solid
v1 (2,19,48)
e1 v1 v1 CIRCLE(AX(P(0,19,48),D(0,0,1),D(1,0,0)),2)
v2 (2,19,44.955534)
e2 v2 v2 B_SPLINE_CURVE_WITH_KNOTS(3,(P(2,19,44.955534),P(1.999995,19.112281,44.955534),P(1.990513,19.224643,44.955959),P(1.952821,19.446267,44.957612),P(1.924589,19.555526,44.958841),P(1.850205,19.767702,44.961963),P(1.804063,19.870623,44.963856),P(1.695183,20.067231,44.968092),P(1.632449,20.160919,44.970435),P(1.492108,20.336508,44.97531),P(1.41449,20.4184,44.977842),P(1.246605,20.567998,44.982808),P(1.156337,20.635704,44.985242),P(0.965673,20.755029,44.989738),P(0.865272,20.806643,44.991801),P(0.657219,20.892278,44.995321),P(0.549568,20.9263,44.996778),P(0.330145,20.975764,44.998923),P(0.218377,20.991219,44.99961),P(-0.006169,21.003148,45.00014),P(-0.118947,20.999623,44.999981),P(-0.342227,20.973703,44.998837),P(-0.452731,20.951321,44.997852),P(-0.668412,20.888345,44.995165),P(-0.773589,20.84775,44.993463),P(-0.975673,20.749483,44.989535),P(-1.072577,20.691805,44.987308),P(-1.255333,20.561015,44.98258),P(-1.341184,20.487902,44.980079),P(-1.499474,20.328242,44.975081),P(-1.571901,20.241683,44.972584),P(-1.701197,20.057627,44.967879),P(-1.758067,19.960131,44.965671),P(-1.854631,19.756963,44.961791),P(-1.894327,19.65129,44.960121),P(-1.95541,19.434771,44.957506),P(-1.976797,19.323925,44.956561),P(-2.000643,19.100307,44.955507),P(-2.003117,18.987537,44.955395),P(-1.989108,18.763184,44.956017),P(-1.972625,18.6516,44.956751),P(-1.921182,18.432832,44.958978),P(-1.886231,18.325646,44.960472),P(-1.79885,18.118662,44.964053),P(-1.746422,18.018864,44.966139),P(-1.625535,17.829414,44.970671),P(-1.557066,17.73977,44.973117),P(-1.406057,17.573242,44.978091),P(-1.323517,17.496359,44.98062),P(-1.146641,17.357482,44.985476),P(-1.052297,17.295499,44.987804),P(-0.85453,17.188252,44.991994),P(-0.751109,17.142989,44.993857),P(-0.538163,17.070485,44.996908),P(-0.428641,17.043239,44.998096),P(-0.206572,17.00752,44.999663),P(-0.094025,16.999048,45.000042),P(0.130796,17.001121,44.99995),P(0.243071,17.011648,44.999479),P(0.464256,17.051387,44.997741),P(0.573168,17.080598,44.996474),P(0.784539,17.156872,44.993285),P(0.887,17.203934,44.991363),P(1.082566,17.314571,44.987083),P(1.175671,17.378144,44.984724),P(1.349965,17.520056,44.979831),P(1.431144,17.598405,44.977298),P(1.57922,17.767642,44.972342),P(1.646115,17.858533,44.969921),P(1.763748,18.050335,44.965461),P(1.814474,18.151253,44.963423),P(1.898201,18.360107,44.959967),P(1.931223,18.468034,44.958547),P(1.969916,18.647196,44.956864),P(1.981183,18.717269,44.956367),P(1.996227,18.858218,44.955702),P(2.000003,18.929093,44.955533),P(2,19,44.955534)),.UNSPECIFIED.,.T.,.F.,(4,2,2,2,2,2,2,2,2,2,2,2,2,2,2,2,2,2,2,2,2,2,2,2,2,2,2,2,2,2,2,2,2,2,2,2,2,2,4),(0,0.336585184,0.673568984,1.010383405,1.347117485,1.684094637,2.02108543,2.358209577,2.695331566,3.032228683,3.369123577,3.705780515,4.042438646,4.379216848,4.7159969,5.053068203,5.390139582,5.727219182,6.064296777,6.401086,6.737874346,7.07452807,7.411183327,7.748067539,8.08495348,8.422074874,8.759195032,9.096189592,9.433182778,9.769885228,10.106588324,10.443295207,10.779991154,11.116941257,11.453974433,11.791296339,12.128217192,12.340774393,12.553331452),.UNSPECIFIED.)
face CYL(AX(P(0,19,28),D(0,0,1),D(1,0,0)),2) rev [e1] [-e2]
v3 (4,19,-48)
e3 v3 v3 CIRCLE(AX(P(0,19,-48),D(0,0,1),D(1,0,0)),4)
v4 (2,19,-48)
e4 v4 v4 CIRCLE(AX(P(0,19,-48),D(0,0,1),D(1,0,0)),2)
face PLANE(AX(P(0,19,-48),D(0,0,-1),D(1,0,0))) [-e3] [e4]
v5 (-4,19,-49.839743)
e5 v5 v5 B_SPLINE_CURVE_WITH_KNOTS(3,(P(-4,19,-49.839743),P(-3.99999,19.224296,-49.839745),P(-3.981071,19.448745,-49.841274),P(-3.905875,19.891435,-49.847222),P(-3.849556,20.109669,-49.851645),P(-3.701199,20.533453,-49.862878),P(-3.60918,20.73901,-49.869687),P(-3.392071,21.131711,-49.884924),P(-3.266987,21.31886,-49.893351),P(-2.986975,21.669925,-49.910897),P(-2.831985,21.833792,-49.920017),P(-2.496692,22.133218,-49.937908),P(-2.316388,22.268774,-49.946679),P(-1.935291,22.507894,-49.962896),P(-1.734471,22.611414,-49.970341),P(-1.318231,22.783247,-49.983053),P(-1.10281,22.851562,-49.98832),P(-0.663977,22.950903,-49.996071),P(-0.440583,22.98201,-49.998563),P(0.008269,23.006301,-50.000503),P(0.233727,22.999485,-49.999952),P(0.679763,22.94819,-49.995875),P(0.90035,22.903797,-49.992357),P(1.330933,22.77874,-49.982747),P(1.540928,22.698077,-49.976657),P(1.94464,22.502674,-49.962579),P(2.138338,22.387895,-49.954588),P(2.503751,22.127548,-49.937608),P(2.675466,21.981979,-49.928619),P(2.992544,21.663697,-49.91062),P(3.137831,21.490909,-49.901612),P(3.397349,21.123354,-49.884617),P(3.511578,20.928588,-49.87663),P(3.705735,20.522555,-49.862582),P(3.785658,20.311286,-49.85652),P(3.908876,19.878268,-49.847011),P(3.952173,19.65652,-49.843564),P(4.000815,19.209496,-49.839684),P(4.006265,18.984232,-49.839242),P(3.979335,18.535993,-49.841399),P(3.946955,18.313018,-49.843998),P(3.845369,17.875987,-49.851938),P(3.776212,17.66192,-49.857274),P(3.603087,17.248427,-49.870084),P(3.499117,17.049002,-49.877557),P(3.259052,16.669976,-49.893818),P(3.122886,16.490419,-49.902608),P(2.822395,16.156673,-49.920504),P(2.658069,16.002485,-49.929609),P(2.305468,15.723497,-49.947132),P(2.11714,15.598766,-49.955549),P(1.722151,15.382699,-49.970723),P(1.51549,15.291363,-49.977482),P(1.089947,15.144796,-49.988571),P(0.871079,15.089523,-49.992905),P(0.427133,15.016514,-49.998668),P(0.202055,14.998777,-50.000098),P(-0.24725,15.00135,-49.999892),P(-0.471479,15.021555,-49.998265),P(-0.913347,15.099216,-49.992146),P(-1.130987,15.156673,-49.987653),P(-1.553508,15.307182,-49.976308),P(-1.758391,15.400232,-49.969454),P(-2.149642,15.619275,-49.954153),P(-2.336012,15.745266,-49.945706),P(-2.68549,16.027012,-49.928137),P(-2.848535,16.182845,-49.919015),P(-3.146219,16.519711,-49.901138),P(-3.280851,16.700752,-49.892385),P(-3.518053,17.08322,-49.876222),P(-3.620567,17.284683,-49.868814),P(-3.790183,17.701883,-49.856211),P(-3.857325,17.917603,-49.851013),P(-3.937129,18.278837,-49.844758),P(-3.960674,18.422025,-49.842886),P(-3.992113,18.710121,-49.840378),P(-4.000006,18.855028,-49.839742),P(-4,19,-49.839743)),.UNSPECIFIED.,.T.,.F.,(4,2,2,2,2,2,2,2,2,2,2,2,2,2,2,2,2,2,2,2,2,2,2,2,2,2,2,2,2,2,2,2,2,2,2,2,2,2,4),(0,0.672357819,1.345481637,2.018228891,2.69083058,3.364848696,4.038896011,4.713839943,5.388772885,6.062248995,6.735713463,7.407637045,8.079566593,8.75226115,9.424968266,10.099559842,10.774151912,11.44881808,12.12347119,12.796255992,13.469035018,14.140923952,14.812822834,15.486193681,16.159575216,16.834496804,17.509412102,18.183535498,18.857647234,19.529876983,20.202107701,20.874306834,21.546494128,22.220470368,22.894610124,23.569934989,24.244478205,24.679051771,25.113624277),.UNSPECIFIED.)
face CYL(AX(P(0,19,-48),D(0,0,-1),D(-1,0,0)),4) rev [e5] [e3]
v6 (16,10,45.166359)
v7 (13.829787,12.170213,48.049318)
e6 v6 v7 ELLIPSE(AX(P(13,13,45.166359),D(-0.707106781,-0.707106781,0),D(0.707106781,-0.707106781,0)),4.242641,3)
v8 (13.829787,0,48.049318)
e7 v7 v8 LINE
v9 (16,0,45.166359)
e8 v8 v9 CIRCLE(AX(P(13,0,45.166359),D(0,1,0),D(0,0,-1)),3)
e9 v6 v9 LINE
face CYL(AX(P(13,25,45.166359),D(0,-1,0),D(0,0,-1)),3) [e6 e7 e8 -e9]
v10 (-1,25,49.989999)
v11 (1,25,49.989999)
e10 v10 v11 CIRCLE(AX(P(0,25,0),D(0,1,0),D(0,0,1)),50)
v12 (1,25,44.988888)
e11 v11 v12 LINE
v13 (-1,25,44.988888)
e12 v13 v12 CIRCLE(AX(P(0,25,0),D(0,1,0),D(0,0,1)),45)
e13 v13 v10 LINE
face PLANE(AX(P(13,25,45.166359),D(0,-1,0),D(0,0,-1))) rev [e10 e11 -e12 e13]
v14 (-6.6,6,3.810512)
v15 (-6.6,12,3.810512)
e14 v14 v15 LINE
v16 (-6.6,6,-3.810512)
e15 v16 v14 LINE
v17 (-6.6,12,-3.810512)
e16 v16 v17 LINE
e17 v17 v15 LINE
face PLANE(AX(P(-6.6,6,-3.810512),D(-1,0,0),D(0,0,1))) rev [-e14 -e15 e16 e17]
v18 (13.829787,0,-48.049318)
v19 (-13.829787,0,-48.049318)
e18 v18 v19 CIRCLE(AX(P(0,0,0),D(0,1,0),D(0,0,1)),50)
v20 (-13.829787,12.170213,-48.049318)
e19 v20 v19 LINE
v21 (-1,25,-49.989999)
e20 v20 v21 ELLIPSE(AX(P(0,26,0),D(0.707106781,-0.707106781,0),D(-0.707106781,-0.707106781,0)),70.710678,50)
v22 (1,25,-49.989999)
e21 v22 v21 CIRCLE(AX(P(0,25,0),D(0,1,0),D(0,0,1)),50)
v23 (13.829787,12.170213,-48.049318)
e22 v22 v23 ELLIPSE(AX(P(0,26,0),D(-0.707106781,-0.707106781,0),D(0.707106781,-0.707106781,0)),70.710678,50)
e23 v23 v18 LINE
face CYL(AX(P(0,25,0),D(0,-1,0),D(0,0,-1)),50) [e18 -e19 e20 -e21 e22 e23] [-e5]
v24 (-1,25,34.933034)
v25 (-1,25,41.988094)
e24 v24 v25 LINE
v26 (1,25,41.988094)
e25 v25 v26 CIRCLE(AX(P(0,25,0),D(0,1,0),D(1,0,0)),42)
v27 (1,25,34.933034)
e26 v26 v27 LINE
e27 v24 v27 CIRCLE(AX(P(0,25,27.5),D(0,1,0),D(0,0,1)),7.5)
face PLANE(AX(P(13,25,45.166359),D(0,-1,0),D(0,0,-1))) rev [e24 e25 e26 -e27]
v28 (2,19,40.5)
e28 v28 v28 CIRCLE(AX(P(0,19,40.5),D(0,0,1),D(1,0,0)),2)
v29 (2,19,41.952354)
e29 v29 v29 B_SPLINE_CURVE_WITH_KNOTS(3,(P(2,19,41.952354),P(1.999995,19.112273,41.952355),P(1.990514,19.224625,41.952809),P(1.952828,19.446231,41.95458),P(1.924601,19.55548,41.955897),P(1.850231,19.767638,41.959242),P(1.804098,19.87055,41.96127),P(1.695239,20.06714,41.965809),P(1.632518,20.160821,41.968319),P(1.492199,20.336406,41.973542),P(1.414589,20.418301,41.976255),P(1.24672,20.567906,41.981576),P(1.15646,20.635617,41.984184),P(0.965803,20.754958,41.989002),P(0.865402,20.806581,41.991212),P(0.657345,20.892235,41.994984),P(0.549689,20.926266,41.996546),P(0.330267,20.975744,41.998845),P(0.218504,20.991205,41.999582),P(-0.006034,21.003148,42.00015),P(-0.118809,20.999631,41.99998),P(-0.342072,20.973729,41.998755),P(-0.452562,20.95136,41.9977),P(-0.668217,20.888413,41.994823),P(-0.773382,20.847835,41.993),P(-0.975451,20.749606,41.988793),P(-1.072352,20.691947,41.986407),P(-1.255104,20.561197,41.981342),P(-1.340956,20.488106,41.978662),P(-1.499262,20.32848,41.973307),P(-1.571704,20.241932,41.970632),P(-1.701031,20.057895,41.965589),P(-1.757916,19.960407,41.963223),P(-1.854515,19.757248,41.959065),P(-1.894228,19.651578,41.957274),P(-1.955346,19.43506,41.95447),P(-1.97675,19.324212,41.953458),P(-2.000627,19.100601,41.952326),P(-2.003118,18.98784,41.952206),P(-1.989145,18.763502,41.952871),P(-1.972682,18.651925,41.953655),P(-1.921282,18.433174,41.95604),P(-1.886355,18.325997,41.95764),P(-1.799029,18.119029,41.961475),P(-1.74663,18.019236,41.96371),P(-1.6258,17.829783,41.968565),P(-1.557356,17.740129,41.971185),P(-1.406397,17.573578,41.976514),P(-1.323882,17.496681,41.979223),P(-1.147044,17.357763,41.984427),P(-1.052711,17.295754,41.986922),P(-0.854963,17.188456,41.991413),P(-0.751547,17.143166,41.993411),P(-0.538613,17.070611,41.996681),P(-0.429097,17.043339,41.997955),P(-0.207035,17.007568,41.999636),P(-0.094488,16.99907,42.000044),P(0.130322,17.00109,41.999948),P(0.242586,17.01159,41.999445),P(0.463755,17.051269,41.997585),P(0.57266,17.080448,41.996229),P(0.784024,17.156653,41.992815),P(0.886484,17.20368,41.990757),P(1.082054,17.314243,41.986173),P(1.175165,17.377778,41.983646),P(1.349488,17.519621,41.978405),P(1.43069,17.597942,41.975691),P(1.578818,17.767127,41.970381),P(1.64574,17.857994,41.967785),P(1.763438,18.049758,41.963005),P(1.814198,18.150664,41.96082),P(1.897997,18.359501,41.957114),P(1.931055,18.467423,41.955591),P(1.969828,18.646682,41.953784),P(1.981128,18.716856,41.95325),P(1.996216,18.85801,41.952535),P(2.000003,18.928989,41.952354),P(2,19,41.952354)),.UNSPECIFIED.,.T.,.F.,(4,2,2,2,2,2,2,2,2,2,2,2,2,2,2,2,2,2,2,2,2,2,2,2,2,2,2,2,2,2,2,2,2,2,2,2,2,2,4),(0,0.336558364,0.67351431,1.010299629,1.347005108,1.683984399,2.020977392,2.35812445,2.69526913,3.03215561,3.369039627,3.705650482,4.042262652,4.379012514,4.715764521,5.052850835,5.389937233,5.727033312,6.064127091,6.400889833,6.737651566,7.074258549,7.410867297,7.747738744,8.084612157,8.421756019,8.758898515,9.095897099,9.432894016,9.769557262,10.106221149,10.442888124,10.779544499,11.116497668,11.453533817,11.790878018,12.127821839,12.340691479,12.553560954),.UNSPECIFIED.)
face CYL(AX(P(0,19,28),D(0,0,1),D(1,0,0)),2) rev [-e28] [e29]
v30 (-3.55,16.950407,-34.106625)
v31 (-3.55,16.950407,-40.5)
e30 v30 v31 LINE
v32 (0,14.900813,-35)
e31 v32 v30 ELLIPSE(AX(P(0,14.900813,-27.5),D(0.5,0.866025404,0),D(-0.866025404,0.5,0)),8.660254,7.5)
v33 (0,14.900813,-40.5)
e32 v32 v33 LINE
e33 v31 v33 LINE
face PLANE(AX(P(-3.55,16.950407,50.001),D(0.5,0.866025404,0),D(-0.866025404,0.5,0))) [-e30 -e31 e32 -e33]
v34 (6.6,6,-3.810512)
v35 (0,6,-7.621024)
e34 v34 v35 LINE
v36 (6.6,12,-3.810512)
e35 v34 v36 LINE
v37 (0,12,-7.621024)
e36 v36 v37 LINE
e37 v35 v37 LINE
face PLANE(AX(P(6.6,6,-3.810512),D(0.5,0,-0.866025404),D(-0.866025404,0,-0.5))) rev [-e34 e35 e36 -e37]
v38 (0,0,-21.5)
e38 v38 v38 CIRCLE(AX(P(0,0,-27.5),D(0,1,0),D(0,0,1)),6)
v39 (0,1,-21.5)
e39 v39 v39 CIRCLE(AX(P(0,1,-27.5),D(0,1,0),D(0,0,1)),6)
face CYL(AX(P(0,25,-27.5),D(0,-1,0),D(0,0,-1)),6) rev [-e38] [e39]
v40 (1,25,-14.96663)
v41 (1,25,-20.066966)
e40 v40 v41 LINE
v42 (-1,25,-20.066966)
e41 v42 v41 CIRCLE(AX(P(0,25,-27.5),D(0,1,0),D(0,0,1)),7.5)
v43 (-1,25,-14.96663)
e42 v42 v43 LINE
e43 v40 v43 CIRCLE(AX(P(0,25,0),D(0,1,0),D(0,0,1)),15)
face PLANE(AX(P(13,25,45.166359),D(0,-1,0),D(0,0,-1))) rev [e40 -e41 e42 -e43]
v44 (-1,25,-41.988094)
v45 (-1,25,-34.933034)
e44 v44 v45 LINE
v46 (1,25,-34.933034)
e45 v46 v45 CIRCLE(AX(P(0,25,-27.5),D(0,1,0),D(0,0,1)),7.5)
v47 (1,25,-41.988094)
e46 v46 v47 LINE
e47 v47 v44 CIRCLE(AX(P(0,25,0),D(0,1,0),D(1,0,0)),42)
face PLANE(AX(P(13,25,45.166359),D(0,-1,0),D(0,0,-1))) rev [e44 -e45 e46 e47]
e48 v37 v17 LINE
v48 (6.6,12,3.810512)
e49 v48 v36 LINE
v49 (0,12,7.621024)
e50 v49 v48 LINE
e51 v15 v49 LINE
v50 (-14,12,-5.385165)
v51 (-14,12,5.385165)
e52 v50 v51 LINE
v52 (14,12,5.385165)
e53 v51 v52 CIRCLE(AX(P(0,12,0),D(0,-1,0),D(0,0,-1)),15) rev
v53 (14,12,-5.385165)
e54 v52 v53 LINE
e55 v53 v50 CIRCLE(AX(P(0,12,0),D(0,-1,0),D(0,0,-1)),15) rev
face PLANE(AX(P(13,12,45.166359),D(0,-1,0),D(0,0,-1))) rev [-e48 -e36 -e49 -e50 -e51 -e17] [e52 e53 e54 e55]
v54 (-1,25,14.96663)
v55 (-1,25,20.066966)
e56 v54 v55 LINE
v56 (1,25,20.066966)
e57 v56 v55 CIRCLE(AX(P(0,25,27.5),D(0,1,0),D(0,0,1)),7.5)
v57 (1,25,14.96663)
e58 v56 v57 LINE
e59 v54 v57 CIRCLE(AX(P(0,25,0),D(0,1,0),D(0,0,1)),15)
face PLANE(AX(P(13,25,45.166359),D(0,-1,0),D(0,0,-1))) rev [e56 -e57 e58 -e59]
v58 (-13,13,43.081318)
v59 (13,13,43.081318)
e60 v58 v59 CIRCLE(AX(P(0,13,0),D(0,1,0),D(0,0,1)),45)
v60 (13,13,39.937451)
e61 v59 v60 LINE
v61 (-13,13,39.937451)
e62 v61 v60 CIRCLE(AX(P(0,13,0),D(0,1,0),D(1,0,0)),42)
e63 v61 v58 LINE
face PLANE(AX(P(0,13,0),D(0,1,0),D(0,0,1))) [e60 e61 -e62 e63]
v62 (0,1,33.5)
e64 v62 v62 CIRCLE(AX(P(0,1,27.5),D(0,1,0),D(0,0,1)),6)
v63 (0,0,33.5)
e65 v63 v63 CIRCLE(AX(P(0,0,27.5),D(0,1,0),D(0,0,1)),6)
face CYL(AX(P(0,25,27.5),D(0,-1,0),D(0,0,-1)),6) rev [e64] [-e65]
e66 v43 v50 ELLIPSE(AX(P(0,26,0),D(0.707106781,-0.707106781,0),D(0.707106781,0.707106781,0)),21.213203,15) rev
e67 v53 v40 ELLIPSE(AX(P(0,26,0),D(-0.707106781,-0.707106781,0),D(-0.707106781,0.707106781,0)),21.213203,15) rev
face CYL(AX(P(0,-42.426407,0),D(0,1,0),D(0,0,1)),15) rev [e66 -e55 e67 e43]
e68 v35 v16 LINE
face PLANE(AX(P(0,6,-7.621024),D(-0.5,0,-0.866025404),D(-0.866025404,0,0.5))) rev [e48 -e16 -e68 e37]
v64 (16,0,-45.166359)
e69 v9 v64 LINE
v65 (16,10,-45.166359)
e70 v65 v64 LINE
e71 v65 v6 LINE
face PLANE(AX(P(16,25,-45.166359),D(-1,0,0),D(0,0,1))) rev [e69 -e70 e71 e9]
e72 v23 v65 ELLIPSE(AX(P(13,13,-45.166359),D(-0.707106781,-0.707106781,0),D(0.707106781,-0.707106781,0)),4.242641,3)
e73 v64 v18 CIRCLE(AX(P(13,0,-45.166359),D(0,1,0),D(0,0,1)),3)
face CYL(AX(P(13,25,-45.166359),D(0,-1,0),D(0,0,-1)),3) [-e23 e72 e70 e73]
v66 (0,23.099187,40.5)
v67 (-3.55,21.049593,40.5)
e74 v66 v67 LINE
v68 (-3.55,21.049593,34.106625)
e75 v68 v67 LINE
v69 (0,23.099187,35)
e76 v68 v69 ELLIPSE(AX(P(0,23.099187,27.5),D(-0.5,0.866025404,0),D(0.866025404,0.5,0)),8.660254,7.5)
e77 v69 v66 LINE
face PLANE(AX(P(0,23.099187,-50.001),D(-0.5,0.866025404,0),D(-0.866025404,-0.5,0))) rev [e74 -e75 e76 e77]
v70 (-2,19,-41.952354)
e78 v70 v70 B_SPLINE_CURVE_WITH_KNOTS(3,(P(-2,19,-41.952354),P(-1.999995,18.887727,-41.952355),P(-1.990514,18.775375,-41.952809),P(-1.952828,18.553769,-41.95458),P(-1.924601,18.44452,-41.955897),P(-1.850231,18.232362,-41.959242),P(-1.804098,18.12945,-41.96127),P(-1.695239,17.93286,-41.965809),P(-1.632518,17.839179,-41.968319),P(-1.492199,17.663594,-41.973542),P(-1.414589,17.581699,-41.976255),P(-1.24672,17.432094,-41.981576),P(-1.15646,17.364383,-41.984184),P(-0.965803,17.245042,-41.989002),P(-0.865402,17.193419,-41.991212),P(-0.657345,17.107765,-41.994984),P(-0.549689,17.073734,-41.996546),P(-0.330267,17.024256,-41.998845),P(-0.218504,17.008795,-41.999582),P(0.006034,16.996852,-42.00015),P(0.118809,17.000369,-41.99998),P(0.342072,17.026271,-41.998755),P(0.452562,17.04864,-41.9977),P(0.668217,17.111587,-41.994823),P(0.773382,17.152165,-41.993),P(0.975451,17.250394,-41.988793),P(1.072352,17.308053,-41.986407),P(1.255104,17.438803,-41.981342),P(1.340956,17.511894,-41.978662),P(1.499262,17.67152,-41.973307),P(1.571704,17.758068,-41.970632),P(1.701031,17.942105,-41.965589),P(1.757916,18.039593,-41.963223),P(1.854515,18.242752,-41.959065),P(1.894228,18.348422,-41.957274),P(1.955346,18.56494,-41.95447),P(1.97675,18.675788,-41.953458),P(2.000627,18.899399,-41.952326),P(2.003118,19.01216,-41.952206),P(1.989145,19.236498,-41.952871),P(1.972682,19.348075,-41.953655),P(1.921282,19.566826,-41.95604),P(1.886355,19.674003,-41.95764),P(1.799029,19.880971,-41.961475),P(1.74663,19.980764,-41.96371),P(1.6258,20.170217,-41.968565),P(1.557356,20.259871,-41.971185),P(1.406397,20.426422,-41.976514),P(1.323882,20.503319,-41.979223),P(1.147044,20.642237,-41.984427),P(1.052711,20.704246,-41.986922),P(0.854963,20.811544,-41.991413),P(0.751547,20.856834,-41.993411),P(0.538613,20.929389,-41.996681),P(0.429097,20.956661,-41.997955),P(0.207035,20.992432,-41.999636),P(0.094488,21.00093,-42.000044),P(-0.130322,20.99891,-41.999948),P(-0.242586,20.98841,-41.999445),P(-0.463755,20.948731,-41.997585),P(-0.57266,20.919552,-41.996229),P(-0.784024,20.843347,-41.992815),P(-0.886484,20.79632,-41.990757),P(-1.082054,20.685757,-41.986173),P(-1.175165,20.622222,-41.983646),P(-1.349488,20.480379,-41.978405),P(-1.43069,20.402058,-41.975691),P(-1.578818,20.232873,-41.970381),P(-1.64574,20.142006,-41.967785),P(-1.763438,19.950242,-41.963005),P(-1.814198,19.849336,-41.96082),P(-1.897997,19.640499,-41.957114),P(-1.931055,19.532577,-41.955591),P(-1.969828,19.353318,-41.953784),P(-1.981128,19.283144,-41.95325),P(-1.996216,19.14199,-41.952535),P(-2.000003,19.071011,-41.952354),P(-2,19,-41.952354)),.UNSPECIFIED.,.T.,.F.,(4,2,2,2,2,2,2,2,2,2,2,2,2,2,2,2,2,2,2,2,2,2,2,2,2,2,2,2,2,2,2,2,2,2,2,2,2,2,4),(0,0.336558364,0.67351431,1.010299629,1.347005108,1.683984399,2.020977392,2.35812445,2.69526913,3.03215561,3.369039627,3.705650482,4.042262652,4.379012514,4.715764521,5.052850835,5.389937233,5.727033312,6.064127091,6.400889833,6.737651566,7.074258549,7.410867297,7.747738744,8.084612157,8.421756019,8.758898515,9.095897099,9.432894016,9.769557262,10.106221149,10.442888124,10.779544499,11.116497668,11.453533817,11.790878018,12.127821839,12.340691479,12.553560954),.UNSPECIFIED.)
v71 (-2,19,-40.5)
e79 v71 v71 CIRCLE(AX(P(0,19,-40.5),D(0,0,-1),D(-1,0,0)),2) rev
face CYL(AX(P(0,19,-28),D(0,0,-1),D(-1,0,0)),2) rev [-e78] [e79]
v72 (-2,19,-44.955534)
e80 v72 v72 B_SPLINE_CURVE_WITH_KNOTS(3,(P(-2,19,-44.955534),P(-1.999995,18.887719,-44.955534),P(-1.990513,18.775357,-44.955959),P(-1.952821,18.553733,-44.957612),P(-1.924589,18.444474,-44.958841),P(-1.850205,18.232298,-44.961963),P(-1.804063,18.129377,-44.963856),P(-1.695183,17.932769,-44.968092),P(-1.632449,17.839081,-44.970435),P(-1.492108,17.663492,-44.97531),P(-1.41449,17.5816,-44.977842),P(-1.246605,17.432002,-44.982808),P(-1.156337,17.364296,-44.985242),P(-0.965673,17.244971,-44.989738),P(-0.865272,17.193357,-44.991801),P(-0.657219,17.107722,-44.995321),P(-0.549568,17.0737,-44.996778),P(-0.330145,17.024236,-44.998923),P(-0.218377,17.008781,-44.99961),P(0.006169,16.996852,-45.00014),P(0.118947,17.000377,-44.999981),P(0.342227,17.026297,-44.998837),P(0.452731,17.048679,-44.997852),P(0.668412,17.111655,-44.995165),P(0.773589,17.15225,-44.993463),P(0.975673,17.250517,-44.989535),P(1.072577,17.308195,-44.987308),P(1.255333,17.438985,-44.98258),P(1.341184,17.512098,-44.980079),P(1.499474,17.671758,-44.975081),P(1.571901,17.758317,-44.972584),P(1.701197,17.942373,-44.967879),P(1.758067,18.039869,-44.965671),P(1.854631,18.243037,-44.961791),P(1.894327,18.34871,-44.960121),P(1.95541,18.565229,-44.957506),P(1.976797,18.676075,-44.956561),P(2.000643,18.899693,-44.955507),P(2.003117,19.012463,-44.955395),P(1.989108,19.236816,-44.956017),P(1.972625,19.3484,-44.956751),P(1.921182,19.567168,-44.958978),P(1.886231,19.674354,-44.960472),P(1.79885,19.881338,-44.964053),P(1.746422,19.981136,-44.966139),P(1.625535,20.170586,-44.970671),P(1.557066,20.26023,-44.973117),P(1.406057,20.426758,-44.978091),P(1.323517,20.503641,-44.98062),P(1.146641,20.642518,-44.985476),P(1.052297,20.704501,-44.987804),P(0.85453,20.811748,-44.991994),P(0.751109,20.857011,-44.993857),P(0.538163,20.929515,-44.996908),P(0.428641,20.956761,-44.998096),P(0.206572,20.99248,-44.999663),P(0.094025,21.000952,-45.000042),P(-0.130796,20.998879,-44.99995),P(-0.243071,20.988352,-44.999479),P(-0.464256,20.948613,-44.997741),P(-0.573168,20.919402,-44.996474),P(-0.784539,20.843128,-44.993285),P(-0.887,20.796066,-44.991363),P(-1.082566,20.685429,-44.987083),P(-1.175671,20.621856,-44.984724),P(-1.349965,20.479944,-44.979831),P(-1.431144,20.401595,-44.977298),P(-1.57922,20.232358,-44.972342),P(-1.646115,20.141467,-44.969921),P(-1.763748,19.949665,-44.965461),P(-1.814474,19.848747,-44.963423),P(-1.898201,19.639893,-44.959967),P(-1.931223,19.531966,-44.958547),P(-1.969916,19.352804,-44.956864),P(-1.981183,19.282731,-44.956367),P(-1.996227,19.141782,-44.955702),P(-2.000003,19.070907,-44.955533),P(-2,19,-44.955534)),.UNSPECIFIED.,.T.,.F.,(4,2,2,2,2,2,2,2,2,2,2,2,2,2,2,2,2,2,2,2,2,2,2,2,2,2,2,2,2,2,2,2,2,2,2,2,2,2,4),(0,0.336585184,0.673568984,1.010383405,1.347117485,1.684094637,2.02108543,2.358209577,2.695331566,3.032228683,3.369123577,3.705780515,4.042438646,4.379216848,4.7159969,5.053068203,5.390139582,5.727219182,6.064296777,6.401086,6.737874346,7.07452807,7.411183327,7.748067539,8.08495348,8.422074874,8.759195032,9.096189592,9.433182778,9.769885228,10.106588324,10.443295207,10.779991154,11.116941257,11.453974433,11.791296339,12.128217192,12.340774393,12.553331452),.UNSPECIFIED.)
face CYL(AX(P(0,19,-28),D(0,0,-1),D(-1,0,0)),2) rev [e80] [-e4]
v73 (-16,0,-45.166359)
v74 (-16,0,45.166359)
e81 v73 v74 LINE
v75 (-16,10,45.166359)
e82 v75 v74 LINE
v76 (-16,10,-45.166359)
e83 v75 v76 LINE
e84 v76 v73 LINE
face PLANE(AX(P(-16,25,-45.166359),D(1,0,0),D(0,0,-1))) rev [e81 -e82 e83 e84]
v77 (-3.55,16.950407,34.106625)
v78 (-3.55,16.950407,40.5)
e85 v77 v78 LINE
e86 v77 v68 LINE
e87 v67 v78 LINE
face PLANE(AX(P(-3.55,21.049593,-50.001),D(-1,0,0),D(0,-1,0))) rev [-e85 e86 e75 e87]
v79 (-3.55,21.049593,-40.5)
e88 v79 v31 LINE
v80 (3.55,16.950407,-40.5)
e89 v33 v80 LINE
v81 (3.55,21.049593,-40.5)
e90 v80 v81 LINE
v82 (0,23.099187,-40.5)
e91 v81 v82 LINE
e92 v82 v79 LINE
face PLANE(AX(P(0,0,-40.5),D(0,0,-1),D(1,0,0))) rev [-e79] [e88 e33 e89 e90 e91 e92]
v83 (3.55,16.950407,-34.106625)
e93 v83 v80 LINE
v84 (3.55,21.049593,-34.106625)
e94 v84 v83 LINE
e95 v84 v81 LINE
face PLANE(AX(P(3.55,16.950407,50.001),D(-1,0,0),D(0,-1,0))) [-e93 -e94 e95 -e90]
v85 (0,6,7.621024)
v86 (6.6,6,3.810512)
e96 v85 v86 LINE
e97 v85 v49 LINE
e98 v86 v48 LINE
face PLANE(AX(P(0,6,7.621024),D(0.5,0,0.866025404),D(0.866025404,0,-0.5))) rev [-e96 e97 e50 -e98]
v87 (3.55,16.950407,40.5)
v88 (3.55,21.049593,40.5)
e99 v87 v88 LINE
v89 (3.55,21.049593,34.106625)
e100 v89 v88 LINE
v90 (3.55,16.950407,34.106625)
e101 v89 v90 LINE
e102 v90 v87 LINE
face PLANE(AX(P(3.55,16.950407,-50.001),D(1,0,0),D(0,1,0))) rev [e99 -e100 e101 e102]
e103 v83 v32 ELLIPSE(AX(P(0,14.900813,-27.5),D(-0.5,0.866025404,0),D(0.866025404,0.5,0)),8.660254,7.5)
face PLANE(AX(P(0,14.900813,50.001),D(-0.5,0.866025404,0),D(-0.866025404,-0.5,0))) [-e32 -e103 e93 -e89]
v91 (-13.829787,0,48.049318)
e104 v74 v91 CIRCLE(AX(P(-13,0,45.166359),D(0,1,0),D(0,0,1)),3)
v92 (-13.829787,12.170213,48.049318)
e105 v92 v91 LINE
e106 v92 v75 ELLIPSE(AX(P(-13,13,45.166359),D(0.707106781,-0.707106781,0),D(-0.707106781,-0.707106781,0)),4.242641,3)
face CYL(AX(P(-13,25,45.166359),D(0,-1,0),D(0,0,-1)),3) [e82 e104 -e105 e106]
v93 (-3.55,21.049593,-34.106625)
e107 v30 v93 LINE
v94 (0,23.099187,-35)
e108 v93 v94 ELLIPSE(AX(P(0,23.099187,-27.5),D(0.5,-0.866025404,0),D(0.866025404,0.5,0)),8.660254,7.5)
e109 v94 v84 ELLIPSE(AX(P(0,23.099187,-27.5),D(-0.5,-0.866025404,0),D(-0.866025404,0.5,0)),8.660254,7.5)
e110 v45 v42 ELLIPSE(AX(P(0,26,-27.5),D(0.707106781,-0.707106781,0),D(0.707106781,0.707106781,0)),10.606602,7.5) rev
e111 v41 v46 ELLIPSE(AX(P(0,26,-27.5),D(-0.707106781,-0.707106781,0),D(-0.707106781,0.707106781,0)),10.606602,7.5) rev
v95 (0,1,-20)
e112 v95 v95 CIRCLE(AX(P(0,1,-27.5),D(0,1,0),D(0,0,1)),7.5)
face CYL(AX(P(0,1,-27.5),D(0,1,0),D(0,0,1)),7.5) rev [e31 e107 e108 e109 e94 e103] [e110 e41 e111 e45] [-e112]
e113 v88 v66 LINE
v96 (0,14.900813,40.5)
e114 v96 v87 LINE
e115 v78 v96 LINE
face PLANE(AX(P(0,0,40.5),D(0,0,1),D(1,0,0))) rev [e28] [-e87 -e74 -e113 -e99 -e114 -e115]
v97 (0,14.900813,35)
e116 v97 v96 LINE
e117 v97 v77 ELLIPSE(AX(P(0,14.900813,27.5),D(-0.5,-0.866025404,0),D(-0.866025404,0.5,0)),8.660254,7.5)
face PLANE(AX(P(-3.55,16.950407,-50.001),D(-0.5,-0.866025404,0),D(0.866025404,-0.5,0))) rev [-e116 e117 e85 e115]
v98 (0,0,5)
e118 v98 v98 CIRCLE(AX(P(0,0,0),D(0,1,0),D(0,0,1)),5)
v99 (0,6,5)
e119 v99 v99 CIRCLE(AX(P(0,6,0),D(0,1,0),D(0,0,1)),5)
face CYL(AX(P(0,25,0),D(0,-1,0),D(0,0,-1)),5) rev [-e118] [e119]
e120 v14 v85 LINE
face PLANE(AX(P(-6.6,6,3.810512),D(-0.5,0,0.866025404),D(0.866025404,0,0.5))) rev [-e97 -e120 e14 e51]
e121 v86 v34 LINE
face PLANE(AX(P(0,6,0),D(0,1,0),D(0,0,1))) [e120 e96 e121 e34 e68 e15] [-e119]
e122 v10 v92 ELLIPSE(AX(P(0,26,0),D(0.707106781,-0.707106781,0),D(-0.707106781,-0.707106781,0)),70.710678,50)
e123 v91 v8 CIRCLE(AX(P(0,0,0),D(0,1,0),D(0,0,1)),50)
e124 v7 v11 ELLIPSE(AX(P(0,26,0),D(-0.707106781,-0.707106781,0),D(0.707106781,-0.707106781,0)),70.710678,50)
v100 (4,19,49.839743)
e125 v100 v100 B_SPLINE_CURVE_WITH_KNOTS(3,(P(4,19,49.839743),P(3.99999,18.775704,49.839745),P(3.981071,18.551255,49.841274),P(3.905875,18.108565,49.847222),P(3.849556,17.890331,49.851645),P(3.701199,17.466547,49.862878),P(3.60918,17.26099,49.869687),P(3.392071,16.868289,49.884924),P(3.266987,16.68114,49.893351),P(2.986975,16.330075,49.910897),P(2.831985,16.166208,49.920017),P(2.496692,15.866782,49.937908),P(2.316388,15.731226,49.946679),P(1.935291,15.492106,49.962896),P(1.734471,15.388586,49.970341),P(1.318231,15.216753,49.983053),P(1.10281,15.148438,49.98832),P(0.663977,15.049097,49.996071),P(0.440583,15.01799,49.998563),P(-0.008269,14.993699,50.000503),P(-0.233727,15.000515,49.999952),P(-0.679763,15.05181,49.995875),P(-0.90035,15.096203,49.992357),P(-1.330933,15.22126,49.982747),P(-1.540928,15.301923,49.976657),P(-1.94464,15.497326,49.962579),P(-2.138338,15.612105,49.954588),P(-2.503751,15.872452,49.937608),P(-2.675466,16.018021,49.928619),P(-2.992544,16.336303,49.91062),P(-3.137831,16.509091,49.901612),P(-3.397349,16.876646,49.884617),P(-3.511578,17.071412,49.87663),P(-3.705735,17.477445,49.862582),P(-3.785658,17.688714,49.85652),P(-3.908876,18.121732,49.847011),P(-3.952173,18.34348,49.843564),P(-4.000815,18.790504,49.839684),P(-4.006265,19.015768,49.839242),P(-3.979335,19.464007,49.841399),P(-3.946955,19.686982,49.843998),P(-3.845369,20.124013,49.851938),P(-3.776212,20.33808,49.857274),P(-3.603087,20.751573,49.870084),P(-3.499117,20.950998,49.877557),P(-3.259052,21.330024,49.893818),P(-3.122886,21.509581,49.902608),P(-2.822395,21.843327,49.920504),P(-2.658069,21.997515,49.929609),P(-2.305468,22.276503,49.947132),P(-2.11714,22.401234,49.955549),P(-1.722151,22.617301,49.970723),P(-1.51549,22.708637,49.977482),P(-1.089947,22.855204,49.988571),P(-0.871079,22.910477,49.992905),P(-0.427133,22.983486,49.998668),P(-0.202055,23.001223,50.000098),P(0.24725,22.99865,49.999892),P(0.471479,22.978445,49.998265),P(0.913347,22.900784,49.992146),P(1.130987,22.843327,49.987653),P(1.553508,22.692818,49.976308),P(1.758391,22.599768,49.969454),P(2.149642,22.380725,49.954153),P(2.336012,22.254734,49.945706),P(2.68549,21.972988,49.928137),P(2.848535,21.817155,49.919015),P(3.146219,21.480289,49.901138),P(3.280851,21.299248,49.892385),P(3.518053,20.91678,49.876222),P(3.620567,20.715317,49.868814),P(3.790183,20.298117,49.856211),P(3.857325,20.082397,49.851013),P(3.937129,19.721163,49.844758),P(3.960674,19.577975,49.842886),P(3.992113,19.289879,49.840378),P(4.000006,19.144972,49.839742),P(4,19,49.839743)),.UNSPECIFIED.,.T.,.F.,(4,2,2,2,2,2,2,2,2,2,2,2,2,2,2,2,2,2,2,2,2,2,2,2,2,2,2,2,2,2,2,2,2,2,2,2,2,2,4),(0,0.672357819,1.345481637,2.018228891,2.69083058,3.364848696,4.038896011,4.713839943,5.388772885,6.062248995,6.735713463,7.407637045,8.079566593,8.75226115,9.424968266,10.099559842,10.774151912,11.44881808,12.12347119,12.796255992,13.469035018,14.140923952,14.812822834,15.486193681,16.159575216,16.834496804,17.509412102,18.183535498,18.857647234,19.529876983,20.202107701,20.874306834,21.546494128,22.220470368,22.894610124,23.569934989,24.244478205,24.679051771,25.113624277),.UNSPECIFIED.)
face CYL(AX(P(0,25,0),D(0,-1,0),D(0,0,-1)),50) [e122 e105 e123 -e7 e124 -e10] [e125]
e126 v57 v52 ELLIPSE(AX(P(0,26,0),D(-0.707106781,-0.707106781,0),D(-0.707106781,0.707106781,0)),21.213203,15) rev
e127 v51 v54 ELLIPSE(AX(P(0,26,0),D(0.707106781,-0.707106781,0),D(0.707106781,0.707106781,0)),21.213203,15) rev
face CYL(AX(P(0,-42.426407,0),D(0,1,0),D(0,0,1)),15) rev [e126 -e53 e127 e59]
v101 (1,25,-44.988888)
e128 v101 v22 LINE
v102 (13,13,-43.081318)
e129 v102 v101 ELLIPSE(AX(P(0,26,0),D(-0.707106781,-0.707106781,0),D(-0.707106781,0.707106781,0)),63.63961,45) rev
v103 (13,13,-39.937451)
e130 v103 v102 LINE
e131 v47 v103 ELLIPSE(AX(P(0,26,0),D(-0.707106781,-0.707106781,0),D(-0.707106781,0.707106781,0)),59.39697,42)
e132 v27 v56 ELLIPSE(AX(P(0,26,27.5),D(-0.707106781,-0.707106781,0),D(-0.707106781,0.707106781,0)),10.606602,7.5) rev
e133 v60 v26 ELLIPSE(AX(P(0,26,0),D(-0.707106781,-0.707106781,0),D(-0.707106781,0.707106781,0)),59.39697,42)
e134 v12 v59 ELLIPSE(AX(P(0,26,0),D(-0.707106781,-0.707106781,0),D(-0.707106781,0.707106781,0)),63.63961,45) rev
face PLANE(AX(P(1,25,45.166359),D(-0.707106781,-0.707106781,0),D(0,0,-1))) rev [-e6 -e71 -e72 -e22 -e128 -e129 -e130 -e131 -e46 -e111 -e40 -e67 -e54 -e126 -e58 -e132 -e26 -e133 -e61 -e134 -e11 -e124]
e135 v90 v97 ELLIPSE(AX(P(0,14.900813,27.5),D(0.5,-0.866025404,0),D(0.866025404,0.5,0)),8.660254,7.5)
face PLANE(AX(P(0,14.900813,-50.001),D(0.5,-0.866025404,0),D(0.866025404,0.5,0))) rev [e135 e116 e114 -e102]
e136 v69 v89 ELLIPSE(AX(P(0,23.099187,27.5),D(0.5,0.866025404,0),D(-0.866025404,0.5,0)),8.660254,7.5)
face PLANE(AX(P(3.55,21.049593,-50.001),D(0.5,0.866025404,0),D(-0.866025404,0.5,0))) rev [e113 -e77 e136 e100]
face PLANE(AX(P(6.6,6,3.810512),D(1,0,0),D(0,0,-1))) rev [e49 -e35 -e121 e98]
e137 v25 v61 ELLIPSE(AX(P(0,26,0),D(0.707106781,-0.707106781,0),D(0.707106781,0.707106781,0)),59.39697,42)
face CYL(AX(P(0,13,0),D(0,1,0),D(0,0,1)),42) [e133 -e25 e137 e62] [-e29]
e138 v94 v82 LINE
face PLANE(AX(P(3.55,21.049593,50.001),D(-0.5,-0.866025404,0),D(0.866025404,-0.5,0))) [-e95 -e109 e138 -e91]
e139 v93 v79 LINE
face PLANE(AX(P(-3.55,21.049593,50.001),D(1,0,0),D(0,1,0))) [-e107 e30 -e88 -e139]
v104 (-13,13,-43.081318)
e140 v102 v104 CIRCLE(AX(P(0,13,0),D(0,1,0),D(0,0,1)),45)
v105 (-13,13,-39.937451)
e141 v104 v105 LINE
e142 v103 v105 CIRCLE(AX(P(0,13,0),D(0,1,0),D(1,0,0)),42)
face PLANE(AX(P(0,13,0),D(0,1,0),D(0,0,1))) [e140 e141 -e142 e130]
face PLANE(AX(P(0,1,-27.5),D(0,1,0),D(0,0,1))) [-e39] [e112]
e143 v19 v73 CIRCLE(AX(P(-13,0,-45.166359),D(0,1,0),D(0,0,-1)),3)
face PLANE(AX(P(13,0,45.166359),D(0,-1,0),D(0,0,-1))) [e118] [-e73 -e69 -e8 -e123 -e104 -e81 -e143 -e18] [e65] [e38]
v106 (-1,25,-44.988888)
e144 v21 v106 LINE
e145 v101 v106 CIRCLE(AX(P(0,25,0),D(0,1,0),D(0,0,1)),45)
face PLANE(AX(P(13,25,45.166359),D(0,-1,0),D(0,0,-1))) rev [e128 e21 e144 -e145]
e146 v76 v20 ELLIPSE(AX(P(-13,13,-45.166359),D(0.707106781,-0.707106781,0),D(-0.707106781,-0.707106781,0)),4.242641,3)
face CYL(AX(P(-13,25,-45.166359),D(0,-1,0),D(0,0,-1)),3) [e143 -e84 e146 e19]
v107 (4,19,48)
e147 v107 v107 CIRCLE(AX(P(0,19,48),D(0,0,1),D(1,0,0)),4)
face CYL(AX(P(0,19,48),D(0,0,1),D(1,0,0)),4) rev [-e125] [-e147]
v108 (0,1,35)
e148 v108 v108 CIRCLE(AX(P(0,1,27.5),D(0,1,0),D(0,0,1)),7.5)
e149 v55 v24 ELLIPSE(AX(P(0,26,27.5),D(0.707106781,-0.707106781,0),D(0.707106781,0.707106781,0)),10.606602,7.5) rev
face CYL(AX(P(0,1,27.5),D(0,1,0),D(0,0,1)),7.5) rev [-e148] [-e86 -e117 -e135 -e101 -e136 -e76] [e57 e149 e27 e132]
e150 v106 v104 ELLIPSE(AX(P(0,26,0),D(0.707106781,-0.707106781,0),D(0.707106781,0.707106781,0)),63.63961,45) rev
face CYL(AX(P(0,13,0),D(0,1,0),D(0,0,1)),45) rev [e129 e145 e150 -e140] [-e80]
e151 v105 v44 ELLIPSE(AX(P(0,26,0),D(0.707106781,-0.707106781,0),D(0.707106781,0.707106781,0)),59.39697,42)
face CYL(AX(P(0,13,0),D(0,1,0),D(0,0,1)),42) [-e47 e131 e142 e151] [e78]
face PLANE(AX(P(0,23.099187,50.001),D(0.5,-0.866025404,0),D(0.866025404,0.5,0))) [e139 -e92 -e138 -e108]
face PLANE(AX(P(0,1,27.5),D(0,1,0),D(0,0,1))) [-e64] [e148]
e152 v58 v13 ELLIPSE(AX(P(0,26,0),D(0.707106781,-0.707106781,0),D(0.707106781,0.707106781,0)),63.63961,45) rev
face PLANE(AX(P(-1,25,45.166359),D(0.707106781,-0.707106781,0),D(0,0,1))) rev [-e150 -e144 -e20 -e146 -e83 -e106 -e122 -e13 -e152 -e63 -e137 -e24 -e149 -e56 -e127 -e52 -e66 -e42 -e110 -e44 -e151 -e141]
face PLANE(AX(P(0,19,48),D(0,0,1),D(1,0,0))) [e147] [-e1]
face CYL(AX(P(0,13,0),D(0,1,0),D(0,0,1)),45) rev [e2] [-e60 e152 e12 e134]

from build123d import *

# Parameters (mm, degrees)
SKETCH1_R               = 5
SKETCH1_R_2             = 6
BOSS_EXTRUDE1_DEPTH     = 25
SKETCH2_R               = 7.5
CUT_EXTRUDE1_DEPTH      = 24
SKETCH3_R               = 15
CUT_EXTRUDE2_DEPTH      = 13
CUT_EXTRUDE3_DEPTH      = 6
SKETCH5_R               = 45
SKETCH5_R_2             = 42
CUT_EXTRUDE_THIN1_DEPTH = 12
CHAMFER1_SIZE           = 15
SKETCH6_R               = 4
CUT_EXTRUDE4_DEPTH      = 2
SKETCH7_R               = 2
CUT_EXTRUDE5_DEPTH      = 20
CUT_EXTRUDE6_REACH      = 111.896
CUT_EXTRUDE6_END_RADIUS = 7.5
CUT_EXTRUDE6_START      = -7.5


with BuildPart() as part:
    # Sketch1 → Boss-Extrude1 (new body)
    with BuildSketch(Plane(origin=(0, 0, 0), x_dir=(1, 0, 0), z_dir=(0, 1, 0))):
        with BuildLine():
            Line((-16, 45.166359163), (-16, -45.166359163))
            ThreePointArc((-16, -45.166359163), (-15.396806386, -46.970609464), (-13.829787234, -48.049318258))
            ThreePointArc((-13.829787234, -48.049318258), (0, -50), (13.829787234, -48.049318258))
            ThreePointArc((13.829787234, -48.049318258), (15.396806386, -46.970609464), (16, -45.166359163))
            Line((16, -45.166359163), (16, 45.166359163))
            ThreePointArc((16, 45.166359163), (15.396806386, 46.970609464), (13.829787234, 48.049318258))
            ThreePointArc((13.829787234, 48.049318258), (0, 50), (-13.829787234, 48.049318258))
            ThreePointArc((-13.829787234, 48.049318258), (-15.396806386, 46.970609464), (-16, 45.166359163))
        make_face()
        with Locations(Location((0, 0, 0), (0, 0, 270))):
            Circle(SKETCH1_R, mode=Mode.SUBTRACT)
        with Locations(Location((0, -27.5, 0), (0, 0, 270))):
            Circle(SKETCH1_R_2, mode=Mode.SUBTRACT)
        with Locations(Location((0, 27.5, 0), (0, 0, 270))):
            Circle(SKETCH1_R_2, mode=Mode.SUBTRACT)
    extrude(amount=BOSS_EXTRUDE1_DEPTH)

    # Sketch2 → Cut-Extrude1 (cut)
    with BuildSketch(Plane(origin=(0, 25, 0), x_dir=(1, 0, 0), z_dir=(0, 1, 0))):
        with Locations(Location((0, 27.5, 0), (0, 0, 270))):
            Circle(SKETCH2_R)
        with Locations(Location((0, -27.5, 0), (0, 0, 270))):
            Circle(SKETCH2_R)
    extrude(amount=-CUT_EXTRUDE1_DEPTH, mode=Mode.SUBTRACT)

    # Sketch3 → Cut-Extrude2 (cut)
    with BuildSketch(Plane(origin=(0, 25, 0), x_dir=(1, 0, 0), z_dir=(0, 1, 0))):
        with Locations(Location((0, 0, 0), (0, 0, 270))):
            Circle(SKETCH3_R)
    extrude(amount=-CUT_EXTRUDE2_DEPTH, mode=Mode.SUBTRACT)

    # Sketch4 → Cut-Extrude3 (cut)
    with BuildSketch(Plane(origin=(0, 12, 0), x_dir=(1, 0, 0), z_dir=(0, 1, 0))):
        Polygon((0, 7.621023553), (-6.6, 3.810511777), (-6.6, -3.810511777), (0, -7.621023553), (6.6, -3.810511777), (6.6, 3.810511777), align=None)
    extrude(amount=-CUT_EXTRUDE3_DEPTH, mode=Mode.SUBTRACT)

    # Sketch5 → Cut-Extrude-Thin1 (cut)
    with BuildSketch(Plane(origin=(0, 25, 0), x_dir=(1, 0, 0), z_dir=(0, 1, 0))):
        Circle(SKETCH5_R)
        Circle(SKETCH5_R_2, mode=Mode.SUBTRACT)
    extrude(amount=-CUT_EXTRUDE_THIN1_DEPTH, mode=Mode.SUBTRACT)

    # Chamfer1
    # the kernel refuses this chamfer: 15 mm, written as the material it takes off along each edge
    with BuildSketch(Plane(origin=(-16, 25, -77.408220497), x_dir=(-0.02749587661058632, -0.9996219169112968, 0), z_dir=(0, 0, 1))) as chamfer1_piece_1:
        Polygon((CHAMFER1_SIZE * 0.999621916911, CHAMFER1_SIZE * 0.0274958766106), (-CHAMFER1_SIZE * 0.0274958766106, CHAMFER1_SIZE * 0.999621916911), (0, 0), align=None)
    extrude(amount=154.816440995, mode=Mode.SUBTRACT)
    with BuildSketch(Plane(origin=(16, 25, 77.408220497), x_dir=(-0.9996219169112968, 0.02749587661058632, 0), z_dir=(0, 0, -1))) as chamfer1_piece_2:
        Polygon((CHAMFER1_SIZE * 0.999621916911, -CHAMFER1_SIZE * 0.0274958766106), (-CHAMFER1_SIZE * 0.0274958766106, -CHAMFER1_SIZE * 0.999621916911), (0, 0), align=None)
    extrude(amount=154.816440995, mode=Mode.SUBTRACT)

    # Sketch6 → Cut-Extrude4 (cut)
    with BuildSketch(Plane.XY.offset(50)):
        with Locations((0, 19)):
            Circle(SKETCH6_R)
    cut_extrude4 = extrude(amount=-CUT_EXTRUDE4_DEPTH, mode=Mode.SUBTRACT)

    # Sketch7 → Cut-Extrude5 (cut)
    with BuildSketch(Plane.XY.offset(48)):
        with Locations((0, 19)):
            Circle(SKETCH7_R)
    cut_extrude5 = extrude(amount=-CUT_EXTRUDE5_DEPTH, mode=Mode.SUBTRACT)

    # Cut-Extrude6: up to this cylinder (the profile starts outside it)
    cut_extrude6_end = Plane(origin=(0, 19, 27.5), z_dir=(0, 1, 0)) * Cylinder(CUT_EXTRUDE6_END_RADIUS, 239.792, mode=Mode.PRIVATE)
    # Sketch8 → Cut-Extrude6 (cut, up to the surface)
    with BuildSketch(Plane.XY.offset(48).offset(CUT_EXTRUDE6_START), mode=Mode.PRIVATE) as cut_extrude6_sk1:
        Polygon((0, 14.900813089), (3.55, 16.950406544), (3.55, 21.049593456), (0, 23.099186911), (-3.55, 21.049593456), (-3.55, 16.950406544), align=None)
    cut_extrude6_tool1 = extrude(cut_extrude6_sk1.sketch, amount=-CUT_EXTRUDE6_REACH, mode=Mode.PRIVATE) - cut_extrude6_end
    cut_extrude6 = cut_extrude6_tool1.solids().sort_by_distance((0, 19, 40.5))[0]
    add(cut_extrude6, mode=Mode.SUBTRACT)

    # Mirror1: Cut-Extrude4, Cut-Extrude5, Cut-Extrude6 across plane
    add(cut_extrude4.mirror(Plane.XY), mode=Mode.SUBTRACT)
    add(cut_extrude5.mirror(Plane.XY), mode=Mode.SUBTRACT)
    add(cut_extrude6.mirror(Plane.XY), mode=Mode.SUBTRACT)


solid = part.part
